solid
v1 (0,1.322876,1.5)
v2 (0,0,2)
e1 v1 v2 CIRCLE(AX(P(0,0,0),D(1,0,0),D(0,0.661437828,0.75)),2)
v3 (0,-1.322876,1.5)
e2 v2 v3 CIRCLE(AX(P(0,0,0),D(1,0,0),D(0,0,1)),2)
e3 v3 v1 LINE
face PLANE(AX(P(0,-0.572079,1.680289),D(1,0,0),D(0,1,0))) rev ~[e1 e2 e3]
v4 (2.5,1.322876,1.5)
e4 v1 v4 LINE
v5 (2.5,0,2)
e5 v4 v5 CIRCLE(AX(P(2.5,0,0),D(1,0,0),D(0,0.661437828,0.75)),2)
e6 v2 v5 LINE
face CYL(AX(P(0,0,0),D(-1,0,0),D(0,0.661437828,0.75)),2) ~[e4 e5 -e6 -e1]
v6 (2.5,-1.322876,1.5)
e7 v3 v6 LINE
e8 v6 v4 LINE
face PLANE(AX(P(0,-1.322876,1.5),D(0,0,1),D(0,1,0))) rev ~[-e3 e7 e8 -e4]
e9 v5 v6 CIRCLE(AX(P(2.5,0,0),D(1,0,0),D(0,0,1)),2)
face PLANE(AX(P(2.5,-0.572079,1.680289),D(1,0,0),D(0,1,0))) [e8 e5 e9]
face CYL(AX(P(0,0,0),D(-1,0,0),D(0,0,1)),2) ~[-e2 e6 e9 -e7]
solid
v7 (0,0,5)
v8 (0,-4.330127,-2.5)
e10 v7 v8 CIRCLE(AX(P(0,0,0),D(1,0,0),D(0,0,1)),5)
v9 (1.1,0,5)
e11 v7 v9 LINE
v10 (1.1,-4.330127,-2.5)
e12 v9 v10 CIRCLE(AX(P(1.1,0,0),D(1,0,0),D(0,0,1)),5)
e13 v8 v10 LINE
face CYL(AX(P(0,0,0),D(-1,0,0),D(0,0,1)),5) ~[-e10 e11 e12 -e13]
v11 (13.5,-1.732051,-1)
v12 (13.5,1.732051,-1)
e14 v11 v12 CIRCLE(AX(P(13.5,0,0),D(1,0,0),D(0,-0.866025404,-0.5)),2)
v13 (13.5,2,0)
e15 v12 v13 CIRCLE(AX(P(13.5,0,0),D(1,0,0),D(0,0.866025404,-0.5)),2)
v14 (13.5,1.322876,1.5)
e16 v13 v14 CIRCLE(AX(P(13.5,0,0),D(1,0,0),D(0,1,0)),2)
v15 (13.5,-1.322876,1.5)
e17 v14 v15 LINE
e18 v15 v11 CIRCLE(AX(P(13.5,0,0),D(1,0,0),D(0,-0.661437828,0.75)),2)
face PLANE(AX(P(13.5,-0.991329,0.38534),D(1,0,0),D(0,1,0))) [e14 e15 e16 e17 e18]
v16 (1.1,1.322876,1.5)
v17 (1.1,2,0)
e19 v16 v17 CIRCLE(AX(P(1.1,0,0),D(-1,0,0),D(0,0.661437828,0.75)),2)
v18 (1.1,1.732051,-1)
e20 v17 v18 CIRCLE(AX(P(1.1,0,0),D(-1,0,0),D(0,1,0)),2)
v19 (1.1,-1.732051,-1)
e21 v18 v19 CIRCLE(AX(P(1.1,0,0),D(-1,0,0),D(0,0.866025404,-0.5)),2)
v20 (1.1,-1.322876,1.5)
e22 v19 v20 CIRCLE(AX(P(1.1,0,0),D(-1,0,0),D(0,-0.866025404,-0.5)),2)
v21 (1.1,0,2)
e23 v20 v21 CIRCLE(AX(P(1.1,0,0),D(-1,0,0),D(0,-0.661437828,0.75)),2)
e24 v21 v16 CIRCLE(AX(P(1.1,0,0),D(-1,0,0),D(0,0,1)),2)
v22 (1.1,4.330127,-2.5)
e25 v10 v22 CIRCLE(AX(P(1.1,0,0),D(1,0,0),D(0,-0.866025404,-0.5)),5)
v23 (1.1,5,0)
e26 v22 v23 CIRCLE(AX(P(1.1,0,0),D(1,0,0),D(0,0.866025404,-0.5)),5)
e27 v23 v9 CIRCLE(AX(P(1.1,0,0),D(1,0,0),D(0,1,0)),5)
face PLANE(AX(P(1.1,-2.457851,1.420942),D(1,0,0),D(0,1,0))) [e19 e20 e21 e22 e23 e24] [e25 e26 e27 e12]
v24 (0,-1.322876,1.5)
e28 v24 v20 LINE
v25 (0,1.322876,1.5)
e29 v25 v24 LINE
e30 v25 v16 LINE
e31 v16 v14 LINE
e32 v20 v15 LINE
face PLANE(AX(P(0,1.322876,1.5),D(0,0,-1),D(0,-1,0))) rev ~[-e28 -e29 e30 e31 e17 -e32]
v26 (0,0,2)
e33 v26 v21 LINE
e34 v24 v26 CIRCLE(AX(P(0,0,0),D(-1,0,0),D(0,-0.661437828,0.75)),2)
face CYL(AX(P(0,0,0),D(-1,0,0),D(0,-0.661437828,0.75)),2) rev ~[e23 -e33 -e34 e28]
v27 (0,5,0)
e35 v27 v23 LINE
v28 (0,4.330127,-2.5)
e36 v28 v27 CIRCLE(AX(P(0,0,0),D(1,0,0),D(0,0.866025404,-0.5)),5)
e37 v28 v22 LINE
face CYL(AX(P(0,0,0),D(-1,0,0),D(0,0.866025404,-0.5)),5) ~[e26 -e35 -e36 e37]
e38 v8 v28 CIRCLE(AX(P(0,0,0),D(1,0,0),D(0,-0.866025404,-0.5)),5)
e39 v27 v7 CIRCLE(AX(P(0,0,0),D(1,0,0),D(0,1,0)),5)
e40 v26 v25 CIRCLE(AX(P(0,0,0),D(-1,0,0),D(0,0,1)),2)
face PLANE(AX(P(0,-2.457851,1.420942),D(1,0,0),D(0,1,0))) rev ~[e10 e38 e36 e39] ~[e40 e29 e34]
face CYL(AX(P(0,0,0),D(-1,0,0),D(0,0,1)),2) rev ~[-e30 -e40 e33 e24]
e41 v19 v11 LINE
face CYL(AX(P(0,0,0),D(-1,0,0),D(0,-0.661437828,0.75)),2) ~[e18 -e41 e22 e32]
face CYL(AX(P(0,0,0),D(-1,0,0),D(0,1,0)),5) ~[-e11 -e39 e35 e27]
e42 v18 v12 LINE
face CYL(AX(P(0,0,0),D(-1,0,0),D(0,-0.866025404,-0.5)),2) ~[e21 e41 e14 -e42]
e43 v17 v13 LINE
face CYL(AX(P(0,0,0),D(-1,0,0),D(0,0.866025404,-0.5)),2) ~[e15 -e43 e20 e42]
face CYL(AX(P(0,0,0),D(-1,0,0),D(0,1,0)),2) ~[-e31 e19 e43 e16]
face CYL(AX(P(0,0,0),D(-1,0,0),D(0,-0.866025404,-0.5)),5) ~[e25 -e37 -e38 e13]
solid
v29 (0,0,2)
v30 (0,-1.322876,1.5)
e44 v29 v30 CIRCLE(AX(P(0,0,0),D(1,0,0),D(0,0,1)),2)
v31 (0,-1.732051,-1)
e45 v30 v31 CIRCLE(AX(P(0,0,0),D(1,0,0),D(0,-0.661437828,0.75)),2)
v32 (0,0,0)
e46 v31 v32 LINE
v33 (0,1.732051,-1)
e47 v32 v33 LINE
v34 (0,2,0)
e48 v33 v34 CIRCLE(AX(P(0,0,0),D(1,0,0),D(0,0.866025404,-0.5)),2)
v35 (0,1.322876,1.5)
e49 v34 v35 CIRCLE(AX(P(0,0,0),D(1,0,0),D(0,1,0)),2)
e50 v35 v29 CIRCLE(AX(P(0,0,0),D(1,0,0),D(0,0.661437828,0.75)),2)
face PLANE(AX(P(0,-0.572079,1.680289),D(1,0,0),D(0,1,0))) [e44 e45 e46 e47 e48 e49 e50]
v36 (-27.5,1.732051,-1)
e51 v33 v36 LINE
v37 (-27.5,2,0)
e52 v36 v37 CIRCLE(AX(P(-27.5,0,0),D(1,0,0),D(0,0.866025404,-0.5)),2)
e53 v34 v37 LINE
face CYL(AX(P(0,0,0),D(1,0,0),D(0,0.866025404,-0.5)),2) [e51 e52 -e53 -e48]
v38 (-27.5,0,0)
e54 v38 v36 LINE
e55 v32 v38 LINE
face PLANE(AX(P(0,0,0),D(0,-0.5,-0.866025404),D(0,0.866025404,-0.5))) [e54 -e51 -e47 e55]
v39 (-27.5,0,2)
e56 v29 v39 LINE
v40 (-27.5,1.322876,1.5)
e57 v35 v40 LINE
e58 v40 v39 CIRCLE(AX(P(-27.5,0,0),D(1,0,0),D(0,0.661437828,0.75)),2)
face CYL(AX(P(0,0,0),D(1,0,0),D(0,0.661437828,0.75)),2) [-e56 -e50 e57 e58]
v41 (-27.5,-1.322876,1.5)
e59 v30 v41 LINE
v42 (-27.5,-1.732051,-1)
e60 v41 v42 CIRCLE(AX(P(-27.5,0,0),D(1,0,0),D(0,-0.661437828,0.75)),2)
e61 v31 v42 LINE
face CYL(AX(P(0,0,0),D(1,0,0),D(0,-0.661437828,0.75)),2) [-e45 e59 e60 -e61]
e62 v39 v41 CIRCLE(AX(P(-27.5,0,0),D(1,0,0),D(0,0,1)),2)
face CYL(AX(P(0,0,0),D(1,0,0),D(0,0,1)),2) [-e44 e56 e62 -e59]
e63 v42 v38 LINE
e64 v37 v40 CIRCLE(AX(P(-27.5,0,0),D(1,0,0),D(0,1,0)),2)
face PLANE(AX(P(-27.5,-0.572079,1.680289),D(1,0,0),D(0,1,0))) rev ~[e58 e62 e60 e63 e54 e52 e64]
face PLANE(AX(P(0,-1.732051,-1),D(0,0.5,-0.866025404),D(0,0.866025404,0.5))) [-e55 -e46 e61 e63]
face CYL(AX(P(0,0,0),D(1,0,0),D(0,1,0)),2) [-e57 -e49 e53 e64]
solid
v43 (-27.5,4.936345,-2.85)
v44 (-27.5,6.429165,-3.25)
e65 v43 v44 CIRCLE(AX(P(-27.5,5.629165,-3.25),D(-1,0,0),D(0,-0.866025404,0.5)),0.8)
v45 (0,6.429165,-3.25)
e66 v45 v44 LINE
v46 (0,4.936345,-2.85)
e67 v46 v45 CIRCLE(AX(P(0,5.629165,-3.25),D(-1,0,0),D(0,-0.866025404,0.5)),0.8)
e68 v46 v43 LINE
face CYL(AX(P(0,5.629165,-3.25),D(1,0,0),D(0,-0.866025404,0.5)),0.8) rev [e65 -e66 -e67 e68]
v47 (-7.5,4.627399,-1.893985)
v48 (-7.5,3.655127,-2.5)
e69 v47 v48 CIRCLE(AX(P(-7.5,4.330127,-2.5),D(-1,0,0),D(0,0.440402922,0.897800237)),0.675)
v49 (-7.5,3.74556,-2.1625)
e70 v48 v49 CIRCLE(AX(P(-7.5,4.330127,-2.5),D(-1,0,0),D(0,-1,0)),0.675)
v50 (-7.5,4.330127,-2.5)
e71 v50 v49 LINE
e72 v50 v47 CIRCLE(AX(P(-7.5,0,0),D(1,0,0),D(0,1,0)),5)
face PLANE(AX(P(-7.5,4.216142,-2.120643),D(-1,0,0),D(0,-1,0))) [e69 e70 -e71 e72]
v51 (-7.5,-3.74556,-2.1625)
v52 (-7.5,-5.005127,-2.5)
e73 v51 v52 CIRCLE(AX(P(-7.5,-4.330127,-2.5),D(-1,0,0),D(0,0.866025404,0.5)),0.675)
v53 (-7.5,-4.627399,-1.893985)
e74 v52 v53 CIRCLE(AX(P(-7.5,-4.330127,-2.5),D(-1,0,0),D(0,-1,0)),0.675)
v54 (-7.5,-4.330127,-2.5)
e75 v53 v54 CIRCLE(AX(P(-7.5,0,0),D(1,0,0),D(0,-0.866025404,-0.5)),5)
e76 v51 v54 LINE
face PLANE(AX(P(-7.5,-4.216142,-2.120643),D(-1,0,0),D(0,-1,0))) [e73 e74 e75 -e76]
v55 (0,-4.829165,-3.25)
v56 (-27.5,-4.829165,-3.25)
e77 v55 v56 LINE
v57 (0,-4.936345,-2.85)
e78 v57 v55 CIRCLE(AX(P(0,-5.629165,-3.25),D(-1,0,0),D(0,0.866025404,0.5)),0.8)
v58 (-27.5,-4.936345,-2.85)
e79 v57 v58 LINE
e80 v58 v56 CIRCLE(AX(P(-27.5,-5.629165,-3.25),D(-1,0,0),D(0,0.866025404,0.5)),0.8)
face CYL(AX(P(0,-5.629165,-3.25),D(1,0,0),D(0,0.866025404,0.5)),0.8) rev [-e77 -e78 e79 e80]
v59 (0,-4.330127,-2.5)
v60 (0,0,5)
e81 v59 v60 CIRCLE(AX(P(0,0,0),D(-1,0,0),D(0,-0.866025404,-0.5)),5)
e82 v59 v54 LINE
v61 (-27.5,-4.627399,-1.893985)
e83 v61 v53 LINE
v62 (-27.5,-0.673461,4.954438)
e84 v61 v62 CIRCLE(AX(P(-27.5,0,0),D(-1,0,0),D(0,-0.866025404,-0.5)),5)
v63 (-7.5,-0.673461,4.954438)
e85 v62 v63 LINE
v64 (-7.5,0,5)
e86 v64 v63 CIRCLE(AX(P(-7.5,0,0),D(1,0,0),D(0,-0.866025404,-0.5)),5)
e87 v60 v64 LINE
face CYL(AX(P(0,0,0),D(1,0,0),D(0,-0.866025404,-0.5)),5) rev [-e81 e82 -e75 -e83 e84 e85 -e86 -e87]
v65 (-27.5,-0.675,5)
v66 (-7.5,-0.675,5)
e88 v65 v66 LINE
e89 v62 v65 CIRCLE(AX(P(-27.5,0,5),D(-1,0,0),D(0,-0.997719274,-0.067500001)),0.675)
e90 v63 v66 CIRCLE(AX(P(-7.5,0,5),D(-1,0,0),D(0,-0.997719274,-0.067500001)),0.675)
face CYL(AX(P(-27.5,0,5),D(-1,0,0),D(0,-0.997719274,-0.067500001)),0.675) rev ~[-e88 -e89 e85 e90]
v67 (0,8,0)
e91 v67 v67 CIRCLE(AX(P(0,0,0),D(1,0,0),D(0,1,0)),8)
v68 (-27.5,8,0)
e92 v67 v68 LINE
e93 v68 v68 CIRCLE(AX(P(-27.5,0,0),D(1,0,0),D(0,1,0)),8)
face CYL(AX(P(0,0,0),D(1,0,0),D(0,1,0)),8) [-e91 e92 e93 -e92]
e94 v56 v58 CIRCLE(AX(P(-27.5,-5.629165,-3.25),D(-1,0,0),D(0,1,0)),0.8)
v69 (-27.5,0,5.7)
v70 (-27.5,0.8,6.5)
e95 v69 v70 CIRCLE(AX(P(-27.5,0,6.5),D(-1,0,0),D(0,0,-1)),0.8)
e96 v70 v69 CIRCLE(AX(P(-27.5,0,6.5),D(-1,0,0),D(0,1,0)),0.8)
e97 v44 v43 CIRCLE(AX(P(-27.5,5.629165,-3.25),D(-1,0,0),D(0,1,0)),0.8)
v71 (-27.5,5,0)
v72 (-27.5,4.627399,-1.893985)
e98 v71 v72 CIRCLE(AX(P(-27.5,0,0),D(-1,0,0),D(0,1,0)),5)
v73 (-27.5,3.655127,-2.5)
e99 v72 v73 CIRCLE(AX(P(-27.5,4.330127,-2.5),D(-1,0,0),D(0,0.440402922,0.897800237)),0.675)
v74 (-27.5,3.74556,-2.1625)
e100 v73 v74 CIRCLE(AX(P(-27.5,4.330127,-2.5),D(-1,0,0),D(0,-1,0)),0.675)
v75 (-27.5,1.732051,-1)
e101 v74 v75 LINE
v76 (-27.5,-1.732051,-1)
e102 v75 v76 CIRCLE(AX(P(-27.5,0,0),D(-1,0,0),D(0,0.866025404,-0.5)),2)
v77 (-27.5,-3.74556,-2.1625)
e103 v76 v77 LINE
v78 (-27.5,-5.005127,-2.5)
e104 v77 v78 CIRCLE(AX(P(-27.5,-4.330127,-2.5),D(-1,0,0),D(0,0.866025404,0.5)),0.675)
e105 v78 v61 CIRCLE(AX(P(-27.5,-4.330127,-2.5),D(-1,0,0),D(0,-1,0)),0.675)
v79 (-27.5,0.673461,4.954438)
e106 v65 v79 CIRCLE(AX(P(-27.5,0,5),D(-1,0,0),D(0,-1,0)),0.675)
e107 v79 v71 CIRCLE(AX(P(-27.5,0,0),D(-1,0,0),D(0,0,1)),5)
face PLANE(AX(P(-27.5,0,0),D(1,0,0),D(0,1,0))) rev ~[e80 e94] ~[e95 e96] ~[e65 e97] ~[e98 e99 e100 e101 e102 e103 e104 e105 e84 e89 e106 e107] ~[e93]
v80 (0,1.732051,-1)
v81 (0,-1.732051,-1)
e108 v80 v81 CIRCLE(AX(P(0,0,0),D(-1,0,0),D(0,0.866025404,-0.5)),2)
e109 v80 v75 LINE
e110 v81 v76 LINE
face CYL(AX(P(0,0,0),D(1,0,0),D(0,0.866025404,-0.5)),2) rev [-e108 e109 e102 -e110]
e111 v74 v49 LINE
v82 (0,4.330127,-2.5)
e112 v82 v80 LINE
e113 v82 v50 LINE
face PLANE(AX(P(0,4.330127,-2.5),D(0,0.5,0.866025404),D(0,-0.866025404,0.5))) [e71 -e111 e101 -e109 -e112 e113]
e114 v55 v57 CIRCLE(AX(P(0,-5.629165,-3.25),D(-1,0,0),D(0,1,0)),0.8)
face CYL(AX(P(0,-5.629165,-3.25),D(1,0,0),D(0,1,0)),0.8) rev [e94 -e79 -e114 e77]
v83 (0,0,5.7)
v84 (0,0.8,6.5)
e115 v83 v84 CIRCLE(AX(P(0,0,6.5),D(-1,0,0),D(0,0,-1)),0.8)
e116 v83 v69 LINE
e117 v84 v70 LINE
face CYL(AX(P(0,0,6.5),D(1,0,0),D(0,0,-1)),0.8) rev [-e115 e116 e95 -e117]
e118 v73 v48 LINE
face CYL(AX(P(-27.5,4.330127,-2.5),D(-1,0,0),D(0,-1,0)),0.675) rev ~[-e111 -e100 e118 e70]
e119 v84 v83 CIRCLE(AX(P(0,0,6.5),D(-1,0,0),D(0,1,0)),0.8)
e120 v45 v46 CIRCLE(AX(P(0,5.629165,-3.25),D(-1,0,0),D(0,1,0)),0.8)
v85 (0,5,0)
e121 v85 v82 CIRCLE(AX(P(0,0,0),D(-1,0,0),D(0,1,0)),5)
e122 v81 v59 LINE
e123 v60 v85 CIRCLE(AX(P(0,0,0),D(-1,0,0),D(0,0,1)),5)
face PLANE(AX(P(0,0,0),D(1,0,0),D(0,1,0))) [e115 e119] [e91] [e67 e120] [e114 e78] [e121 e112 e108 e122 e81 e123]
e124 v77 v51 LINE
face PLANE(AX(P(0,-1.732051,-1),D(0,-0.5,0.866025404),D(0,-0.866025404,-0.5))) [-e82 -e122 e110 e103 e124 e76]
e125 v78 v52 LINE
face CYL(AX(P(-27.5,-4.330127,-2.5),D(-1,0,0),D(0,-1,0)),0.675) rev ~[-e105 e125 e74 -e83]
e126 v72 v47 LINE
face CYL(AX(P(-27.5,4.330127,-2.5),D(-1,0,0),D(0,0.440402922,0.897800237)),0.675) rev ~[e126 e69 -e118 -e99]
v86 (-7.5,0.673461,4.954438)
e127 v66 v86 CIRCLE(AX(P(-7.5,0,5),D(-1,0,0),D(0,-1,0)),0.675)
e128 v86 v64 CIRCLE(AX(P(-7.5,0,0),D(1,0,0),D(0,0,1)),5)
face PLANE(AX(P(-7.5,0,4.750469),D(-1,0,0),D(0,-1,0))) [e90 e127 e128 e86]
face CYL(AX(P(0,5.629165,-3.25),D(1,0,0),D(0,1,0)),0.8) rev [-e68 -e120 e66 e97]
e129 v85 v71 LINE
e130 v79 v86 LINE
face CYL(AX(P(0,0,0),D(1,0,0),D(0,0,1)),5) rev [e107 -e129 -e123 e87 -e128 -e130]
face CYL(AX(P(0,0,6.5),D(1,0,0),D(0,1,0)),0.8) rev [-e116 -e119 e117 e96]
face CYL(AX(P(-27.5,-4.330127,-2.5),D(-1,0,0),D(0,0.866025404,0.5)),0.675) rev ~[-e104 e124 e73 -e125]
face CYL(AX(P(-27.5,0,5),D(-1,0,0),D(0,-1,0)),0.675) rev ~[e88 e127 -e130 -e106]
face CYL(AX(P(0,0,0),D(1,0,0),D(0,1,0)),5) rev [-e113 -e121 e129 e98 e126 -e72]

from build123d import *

# Parameters (mm, degrees)
F1_DEPTH = 13.5
F2_DEPTH = 1.1
F0_R     = 8
F3_DEPTH = 27.5
F6_DEPTH = 20
F7_DEPTH = 2.5


# Not quite as in the source:
# - a feature of the source that left no trace in its solid (it failed there, or was rolled back) is left out


with BuildPart() as f1:
    # F0 (on Right) → F1 (new body)
    with BuildSketch(Plane.YZ):
        with BuildLine():
            ThreePointArc((-1.3228756555, 1.5), (-1.9737385652, 0.323041911), (-1.7320508076, -1))
            Line((-1.7320508076, -1), (0, 0))
            Line((0, 0), (0, 1.5))
            Line((0, 1.5), (-1.3228756555, 1.5))
        make_face()
        with BuildLine():
            Line((0, 0), (1.7320508076, -1))
            ThreePointArc((1.7320508076, -1), (1.9318516526, -0.5176380902), (2, 0))
            ThreePointArc((2, 0), (1.8228756555, 0.8228756555), (1.3228756555, 1.5))
            Line((1.3228756555, 1.5), (0, 1.5))
            Line((0, 1.5), (0, 0))
        make_face()
        with BuildLine():
            ThreePointArc((-1.7320508076, -1), (0, -2), (1.7320508076, -1))
            Line((1.7320508076, -1), (0, 0))
            Line((0, 0), (-1.7320508076, -1))
        make_face()
    extrude(amount=F1_DEPTH)

    # F0 (on Right) → F2 (join)
    with BuildSketch(Plane.YZ):
        with BuildLine():
            Line((0, 2), (0, 5))
            ThreePointArc((0, 5), (-4.3301270189, 2.5), (-4.3301270189, -2.5))
            Line((-4.3301270189, -2.5), (-1.7320508076, -1))
            ThreePointArc((-1.7320508076, -1), (-1.9737385652, 0.323041911), (-1.3228756555, 1.5))
            ThreePointArc((-1.3228756555, 1.5), (-0.7071067812, 1.8708286934), (0, 2))
        make_face()
        with BuildLine():
            ThreePointArc((-4.3301270189, -2.5), (0, -5), (4.3301270189, -2.5))
            Line((4.3301270189, -2.5), (1.7320508076, -1))
            ThreePointArc((1.7320508076, -1), (0, -2), (-1.7320508076, -1))
            Line((-1.7320508076, -1), (-4.3301270189, -2.5))
        make_face()
        with BuildLine():
            ThreePointArc((4.3301270189, -2.5), (4.8296291314, -1.2940952255), (5, 0))
            ThreePointArc((5, 0), (3.5355339059, 3.5355339059), (0, 5))
            Line((0, 5), (0, 2))
            ThreePointArc((0, 2), (0.7071067812, 1.8708286934), (1.3228756555, 1.5))
            ThreePointArc((1.3228756555, 1.5), (1.8228756555, 0.8228756555), (2, 0))
            ThreePointArc((2, 0), (1.9318516526, -0.5176380902), (1.7320508076, -1))
            Line((1.7320508076, -1), (4.3301270189, -2.5))
        make_face()
    extrude(amount=F2_DEPTH)


with BuildPart() as f3:
    # F0 (on Right) → F3 (new body)
    with BuildSketch(Plane.YZ):
        Circle(F0_R)
        with BuildLine():
            ThreePointArc((-4.8291651246, -3.25), (-6.4019057856, -3.4570552361), (-4.9363448016, -2.85))
            ThreePointArc((-4.9363448016, -2.85), (-4.8564244636, -3.0429447639), (-4.8291651246, -3.25))
        make_face(mode=Mode.SUBTRACT)
        with BuildLine():
            ThreePointArc((6.4291651246, -3.25), (5.4221098885, -4.022740661), (4.9363448016, -2.85))
            ThreePointArc((4.9363448016, -2.85), (5.8362203607, -2.477259339), (6.4291651246, -3.25))
        make_face(mode=Mode.SUBTRACT)
        with BuildLine():
            ThreePointArc((0, 5), (3.5355339059, 3.5355339059), (5, 0))
            ThreePointArc((5, 0), (4.8296291314, -1.2940952255), (4.3301270189, -2.5))
            ThreePointArc((4.3301270189, -2.5), (0, -5), (-4.3301270189, -2.5))
            ThreePointArc((-4.3301270189, -2.5), (-4.3301270189, 2.5), (0, 5))
        make_face(mode=Mode.SUBTRACT)
        with BuildLine():
            ThreePointArc((0.8, 6.5), (0.5656854249, 5.9343145751), (0, 5.7))
            ThreePointArc((0, 5.7), (-0.5656854249, 7.0656854249), (0.8, 6.5))
        make_face(mode=Mode.SUBTRACT)
        with BuildLine():
            ThreePointArc((-4.3301270189, -2.5), (0, -5), (4.3301270189, -2.5))
            Line((4.3301270189, -2.5), (1.7320508076, -1))
            ThreePointArc((1.7320508076, -1), (0, -2), (-1.7320508076, -1))
            Line((-1.7320508076, -1), (-4.3301270189, -2.5))
        make_face()
    extrude(amount=-F3_DEPTH)

    # F4 (on face) → F6 (cut)
    with BuildSketch(Plane(origin=(-27.5, 0, 0), x_dir=(0, -1, 0), z_dir=(-1, 0, 0))):
        with BuildLine():
            ThreePointArc((-3.7455598714, -2.1625), (-4.1335062489, -1.8542715177), (-4.6273989915, -1.8939848399))
            ThreePointArc((-4.6273989915, -1.8939848399), (-4.4890011863, -2.2020146116), (-4.3301270189, -2.5))
            Line((-4.3301270189, -2.5), (-3.7455598714, -2.1625))
        make_face()
        with BuildLine():
            ThreePointArc((-4.3301270189, -2.5), (-4.4890011863, -2.2020146116), (-4.6273989915, -1.8939848399))
            ThreePointArc((-4.6273989915, -1.8939848399), (-4.6871749278, -3.0728366178), (-3.6551270189, -2.5))
            ThreePointArc((-3.6551270189, -2.5), (-3.6781270862, -2.3252971446), (-3.7455598714, -2.1625))
            Line((-3.7455598714, -2.1625), (-4.3301270189, -2.5))
        make_face()
        with BuildLine():
            ThreePointArc((0.67346051, 4.9544375), (0, 5), (-0.67346051, 4.9544375))
            ThreePointArc((-0.67346051, 4.9544375), (0, 4.325), (0.67346051, 4.9544375))
        make_face()
        with BuildLine():
            ThreePointArc((0.67346051, 4.9544375), (0.6746150177, 4.9772057494), (0.675, 5))
            ThreePointArc((0.675, 5), (-0.0227942506, 5.6746150177), (-0.67346051, 4.9544375))
            ThreePointArc((-0.67346051, 4.9544375), (0, 5), (0.67346051, 4.9544375))
        make_face()
        with BuildLine():
            ThreePointArc((4.3301270189, -2.5), (4.4890011863, -2.2020146116), (4.6273989915, -1.8939848399))
            ThreePointArc((4.6273989915, -1.8939848399), (4.1335062489, -1.8542715177), (3.7455598714, -2.1625))
            Line((3.7455598714, -2.1625), (4.3301270189, -2.5))
        make_face()
        with BuildLine():
            ThreePointArc((5.0051270189, -2.5), (4.9029636368, -2.1429520911), (4.6273989915, -1.8939848399))
            ThreePointArc((4.6273989915, -1.8939848399), (4.4890011863, -2.2020146116), (4.3301270189, -2.5))
            Line((4.3301270189, -2.5), (3.7455598714, -2.1625))
            ThreePointArc((3.7455598714, -2.1625), (4.1554241635, -3.1519999327), (5.0051270189, -2.5))
        make_face()
    extrude(amount=-F6_DEPTH, mode=Mode.SUBTRACT)


with BuildPart() as f3b:
    # F0 (on Right) → F3, piece 2 (new body)
    with BuildSketch(Plane.YZ):
        with BuildLine():
            Line((0, 1.5), (0, 2))
            ThreePointArc((0, 2), (-0.7071067812, 1.8708286934), (-1.3228756555, 1.5))
            Line((-1.3228756555, 1.5), (0, 1.5))
        make_face()
        with BuildLine():
            ThreePointArc((1.3228756555, 1.5), (0.7071067812, 1.8708286934), (0, 2))
            Line((0, 2), (0, 1.5))
            Line((0, 1.5), (1.3228756555, 1.5))
        make_face()
        with BuildLine():
            Line((0, 0), (1.7320508076, -1))
            ThreePointArc((1.7320508076, -1), (1.9318516526, -0.5176380902), (2, 0))
            ThreePointArc((2, 0), (1.8228756555, 0.8228756555), (1.3228756555, 1.5))
            Line((1.3228756555, 1.5), (0, 1.5))
            Line((0, 1.5), (0, 0))
        make_face()
        with BuildLine():
            ThreePointArc((-1.3228756555, 1.5), (-1.9737385652, 0.323041911), (-1.7320508076, -1))
            Line((-1.7320508076, -1), (0, 0))
            Line((0, 0), (0, 1.5))
            Line((0, 1.5), (-1.3228756555, 1.5))
        make_face()
    extrude(amount=-F3_DEPTH)


with BuildPart() as f7:
    # F0 (on Right) → F7 (new body)
    with BuildSketch(Plane.YZ):
        with BuildLine():
            Line((0, 1.5), (0, 2))
            ThreePointArc((0, 2), (-0.7071067812, 1.8708286934), (-1.3228756555, 1.5))
            Line((-1.3228756555, 1.5), (0, 1.5))
        make_face()
        with BuildLine():
            ThreePointArc((1.3228756555, 1.5), (0.7071067812, 1.8708286934), (0, 2))
            Line((0, 2), (0, 1.5))
            Line((0, 1.5), (1.3228756555, 1.5))
        make_face()
    extrude(amount=F7_DEPTH)


solid = Compound([f1.part, f3.part, f3b.part, f7.part])
